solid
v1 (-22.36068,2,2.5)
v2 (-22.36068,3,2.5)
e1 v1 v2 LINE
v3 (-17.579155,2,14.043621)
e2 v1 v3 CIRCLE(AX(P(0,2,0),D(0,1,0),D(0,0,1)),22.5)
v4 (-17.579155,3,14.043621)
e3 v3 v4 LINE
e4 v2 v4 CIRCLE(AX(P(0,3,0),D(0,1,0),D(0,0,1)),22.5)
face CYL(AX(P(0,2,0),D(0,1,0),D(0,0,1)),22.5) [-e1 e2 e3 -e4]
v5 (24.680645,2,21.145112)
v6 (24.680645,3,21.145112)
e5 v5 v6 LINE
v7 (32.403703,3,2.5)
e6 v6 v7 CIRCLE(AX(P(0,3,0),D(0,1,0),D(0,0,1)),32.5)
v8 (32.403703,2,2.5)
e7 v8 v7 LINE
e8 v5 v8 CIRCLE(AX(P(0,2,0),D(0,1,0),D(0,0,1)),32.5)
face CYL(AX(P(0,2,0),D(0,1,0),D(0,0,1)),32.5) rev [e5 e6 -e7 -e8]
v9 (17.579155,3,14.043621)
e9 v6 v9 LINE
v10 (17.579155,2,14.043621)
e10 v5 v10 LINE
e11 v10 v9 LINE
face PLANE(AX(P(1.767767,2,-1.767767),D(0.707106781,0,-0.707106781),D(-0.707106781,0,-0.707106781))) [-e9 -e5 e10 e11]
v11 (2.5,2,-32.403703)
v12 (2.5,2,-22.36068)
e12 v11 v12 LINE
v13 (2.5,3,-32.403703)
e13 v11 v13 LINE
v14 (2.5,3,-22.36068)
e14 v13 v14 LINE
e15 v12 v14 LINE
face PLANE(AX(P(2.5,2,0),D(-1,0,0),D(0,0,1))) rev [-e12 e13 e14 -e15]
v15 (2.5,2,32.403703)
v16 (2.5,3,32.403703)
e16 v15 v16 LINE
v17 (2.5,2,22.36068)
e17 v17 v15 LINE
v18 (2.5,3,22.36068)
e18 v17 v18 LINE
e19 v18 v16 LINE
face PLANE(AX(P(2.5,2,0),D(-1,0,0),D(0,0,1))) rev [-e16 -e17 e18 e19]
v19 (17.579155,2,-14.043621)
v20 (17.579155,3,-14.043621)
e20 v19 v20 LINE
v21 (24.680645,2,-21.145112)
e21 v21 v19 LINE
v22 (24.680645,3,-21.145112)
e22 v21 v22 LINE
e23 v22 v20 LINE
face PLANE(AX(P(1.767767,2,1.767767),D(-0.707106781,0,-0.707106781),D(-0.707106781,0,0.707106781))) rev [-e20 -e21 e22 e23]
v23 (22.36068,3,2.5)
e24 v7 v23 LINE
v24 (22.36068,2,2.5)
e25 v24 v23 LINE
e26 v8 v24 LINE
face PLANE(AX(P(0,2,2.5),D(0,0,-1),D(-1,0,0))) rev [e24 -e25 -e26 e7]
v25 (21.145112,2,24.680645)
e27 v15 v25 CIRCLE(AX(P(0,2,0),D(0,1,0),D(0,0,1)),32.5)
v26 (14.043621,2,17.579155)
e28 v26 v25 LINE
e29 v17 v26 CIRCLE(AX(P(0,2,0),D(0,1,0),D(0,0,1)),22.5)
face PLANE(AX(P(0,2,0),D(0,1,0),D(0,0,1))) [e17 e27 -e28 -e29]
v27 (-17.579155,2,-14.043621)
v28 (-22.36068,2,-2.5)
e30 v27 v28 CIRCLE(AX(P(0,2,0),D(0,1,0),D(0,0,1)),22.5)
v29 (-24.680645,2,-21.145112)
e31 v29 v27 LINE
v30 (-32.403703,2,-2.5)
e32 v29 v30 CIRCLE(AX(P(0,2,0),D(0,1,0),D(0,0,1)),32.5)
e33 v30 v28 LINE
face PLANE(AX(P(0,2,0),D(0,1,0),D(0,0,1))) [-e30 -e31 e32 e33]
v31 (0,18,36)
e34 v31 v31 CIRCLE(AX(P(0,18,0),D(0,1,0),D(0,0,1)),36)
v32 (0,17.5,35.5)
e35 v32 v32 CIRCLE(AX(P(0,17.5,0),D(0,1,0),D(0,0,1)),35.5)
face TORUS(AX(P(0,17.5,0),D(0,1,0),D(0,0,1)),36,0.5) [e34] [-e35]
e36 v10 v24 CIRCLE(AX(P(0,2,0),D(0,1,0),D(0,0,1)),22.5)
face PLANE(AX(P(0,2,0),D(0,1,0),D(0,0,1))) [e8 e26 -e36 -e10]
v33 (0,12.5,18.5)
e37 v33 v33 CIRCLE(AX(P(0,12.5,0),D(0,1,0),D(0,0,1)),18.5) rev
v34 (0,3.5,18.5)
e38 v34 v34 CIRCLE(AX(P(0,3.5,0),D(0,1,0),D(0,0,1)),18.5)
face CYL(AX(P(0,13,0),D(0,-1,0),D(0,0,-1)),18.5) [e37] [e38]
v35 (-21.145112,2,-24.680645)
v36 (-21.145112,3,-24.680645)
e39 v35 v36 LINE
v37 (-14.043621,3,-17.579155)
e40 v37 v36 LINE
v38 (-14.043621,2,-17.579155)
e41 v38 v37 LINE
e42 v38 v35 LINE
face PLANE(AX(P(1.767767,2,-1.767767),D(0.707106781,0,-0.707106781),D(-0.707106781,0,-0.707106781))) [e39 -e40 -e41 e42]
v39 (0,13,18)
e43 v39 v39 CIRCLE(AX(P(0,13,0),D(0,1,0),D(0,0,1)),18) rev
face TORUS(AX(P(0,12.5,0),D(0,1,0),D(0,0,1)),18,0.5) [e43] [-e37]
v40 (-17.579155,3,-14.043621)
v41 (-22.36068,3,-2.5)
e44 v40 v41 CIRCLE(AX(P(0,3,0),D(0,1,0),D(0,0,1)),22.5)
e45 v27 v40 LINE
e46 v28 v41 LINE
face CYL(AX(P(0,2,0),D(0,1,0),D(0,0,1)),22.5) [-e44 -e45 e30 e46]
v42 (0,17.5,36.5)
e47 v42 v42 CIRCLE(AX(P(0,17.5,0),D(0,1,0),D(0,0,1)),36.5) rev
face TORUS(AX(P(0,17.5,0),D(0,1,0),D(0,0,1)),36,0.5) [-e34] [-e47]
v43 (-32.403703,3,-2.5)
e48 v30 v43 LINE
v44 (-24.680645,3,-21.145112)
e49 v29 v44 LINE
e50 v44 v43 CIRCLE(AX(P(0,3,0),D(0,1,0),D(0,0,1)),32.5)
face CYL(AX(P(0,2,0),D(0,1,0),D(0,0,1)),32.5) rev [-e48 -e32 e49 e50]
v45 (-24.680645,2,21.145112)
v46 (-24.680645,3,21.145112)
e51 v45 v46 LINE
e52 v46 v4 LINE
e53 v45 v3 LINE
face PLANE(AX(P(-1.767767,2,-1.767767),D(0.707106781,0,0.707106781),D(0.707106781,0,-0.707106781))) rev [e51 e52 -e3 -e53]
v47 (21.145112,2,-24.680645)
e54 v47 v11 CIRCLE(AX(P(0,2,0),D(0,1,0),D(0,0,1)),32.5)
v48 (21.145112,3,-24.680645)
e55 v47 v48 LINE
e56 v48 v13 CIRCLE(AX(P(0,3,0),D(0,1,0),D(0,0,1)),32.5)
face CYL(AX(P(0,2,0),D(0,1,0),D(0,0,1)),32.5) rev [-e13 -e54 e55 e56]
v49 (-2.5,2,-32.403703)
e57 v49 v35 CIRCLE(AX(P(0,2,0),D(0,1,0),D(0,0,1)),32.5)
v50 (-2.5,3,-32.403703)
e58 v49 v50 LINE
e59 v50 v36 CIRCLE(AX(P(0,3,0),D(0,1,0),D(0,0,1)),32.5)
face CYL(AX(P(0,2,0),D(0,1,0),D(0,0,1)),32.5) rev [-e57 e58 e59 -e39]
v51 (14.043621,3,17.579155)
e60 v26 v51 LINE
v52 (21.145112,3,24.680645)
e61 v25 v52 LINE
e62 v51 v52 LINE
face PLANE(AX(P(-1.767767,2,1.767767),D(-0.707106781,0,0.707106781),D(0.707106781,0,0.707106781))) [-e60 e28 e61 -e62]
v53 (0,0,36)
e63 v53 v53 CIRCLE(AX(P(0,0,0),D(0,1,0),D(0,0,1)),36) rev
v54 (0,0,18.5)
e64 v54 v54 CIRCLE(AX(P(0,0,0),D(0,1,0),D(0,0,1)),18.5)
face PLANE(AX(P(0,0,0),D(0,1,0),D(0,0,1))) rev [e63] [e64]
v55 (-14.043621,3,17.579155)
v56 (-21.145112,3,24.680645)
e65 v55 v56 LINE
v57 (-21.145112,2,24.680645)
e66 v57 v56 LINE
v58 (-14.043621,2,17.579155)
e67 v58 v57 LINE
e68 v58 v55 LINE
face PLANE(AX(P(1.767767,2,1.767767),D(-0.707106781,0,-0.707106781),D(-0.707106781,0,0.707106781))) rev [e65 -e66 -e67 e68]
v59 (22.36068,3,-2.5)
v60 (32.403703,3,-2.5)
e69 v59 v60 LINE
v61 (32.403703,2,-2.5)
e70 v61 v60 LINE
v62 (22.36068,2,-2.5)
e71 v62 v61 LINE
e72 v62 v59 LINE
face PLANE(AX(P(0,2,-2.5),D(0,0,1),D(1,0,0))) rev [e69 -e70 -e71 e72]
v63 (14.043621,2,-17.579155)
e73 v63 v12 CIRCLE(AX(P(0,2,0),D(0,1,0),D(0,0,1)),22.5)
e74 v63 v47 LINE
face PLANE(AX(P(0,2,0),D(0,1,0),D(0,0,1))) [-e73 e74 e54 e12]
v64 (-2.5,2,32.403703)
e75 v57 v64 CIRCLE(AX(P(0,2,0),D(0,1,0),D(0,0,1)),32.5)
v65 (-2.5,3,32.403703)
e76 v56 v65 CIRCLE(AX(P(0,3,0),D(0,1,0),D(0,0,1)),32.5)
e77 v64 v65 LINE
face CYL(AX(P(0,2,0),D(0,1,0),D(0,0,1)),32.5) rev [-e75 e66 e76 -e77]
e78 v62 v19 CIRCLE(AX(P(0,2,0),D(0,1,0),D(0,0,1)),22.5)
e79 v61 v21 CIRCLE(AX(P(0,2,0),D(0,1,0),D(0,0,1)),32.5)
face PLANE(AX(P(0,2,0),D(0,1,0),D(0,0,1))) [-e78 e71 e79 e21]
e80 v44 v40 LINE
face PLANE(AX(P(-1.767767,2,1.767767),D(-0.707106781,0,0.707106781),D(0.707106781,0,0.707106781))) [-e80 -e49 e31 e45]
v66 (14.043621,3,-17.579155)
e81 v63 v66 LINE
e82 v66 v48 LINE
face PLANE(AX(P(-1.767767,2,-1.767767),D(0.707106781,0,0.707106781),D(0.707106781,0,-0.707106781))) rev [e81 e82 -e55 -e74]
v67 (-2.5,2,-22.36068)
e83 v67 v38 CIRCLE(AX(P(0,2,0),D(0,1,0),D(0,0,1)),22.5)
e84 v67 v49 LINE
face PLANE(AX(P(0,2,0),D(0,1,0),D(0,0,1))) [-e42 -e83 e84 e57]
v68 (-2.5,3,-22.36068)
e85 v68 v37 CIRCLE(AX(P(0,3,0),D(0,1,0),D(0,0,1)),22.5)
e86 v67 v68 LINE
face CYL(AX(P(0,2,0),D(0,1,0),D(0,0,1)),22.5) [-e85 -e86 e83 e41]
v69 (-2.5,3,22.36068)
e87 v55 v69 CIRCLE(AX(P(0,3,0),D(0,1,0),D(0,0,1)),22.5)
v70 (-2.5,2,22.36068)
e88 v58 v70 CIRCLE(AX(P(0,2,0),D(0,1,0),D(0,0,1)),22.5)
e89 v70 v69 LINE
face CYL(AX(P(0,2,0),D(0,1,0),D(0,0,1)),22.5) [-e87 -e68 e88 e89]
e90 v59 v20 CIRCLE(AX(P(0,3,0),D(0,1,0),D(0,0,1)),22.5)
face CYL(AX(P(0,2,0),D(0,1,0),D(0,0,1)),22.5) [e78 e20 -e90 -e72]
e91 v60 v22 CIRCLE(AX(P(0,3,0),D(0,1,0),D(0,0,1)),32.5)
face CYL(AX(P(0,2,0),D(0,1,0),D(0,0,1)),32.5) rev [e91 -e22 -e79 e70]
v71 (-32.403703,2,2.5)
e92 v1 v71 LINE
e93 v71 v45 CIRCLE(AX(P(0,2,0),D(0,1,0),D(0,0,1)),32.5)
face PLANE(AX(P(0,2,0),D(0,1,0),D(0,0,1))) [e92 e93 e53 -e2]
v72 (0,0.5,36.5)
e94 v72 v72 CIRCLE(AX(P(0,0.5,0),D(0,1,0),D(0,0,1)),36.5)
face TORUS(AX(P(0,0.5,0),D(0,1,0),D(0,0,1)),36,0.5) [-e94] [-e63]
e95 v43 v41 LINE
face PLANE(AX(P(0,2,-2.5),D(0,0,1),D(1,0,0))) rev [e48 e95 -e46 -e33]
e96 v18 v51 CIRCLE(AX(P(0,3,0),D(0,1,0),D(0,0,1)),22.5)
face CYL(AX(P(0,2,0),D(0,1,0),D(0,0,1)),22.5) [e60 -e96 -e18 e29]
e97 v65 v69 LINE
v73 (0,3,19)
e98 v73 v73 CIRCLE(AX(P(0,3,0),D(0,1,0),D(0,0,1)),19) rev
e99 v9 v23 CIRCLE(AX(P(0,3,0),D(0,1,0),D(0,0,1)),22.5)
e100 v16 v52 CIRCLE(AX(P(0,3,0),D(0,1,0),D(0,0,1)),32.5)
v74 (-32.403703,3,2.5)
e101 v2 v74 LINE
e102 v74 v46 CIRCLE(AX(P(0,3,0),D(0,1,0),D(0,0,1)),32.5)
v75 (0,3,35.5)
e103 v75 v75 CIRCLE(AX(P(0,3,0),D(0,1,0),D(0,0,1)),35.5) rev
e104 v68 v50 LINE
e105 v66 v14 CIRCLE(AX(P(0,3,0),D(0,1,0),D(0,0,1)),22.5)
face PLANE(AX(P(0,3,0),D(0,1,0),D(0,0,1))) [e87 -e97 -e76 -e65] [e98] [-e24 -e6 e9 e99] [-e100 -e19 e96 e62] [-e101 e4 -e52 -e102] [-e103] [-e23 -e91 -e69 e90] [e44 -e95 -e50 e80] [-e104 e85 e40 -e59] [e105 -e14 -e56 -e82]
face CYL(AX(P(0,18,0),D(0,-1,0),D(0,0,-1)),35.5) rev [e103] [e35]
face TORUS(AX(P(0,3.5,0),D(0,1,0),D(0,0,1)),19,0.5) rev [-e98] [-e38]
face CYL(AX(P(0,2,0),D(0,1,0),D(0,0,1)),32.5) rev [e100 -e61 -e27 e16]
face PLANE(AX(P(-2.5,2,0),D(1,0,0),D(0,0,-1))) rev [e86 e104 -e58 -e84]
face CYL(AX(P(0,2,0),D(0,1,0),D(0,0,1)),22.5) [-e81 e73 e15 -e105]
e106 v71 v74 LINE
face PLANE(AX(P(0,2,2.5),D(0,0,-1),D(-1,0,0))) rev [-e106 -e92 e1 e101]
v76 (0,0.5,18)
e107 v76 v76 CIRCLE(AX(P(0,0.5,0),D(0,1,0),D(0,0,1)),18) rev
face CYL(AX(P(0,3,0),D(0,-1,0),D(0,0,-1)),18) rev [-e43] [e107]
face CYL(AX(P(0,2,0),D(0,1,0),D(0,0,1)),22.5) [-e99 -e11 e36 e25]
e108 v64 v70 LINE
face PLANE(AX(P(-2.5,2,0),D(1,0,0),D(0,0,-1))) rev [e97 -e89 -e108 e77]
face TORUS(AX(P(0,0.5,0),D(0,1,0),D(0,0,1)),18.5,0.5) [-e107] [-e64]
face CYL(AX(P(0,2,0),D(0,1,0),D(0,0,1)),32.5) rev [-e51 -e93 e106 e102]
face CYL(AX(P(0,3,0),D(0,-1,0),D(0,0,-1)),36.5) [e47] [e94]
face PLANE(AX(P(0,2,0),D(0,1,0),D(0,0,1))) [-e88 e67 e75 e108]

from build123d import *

# Parameters (mm, degrees)
SKETCH2_R           = 36.5
SKETCH2_R_2         = 18
BOSS_EXTRUDE1_DEPTH = 3
SKETCH3_R           = 36.5
SKETCH3_R_2         = 35.5
BOSS_EXTRUDE2_DEPTH = 15
SKETCH4_R           = 18.5
SKETCH4_R_2         = 18
BOSS_EXTRUDE3_DEPTH = 10
FILLET1_R           = 0.5
CUT_EXTRUDE1_DEPTH  = 1


with BuildPart() as part:
    # Sketch2 → Boss-Extrude1 (new body)
    with BuildSketch(Plane(origin=(0, 0, 0), x_dir=(1, 0, 0), z_dir=(0, 1, 0))):
        with Locations(Location((0, 0, 0), (0, 0, 270))):
            Circle(SKETCH2_R)
        with Locations(Location((0, 0, 0), (0, 0, 270))):
            Circle(SKETCH2_R_2, mode=Mode.SUBTRACT)
    extrude(amount=BOSS_EXTRUDE1_DEPTH)

    # Sketch3 → Boss-Extrude2 (add)
    with BuildSketch(Plane(origin=(0, 3, 0), x_dir=(1, 0, 0), z_dir=(0, 1, 0))):
        with Locations(Location((0, 0, 0), (0, 0, 270))):
            Circle(SKETCH3_R)
        with Locations(Location((0, 0, 0), (0, 0, 270))):
            Circle(SKETCH3_R_2, mode=Mode.SUBTRACT)
    extrude(amount=BOSS_EXTRUDE2_DEPTH)

    # Sketch4 → Boss-Extrude3 (add)
    with BuildSketch(Plane(origin=(0, 3, 0), x_dir=(1, 0, 0), z_dir=(0, 1, 0))):
        with Locations(Location((0, 0, 0), (0, 0, 270))):
            Circle(SKETCH4_R)
        with Locations(Location((0, 0, 0), (0, 0, 270))):
            Circle(SKETCH4_R_2, mode=Mode.SUBTRACT)
    extrude(amount=BOSS_EXTRUDE3_DEPTH)

    # Fillet1
    fillet1_edges = [part.edges().sort_by_distance(p)[0] for p in [
        (0, 18, -35.5),
        (0, 18, -36.5),
        (0, 3, -18.5),
        (0, 13, -18.5),
        (0, 0, -36.5),
        (0, 0, -18),
    ]]
    fillet(fillet1_edges, radius=FILLET1_R - 0.0001)  # a hair under: the kernel refuses the full size

    # Sketch5 → Cut-Extrude1 (cut)
    with BuildSketch(Plane(origin=(0, 3, 0), x_dir=(1, 0, 0), z_dir=(0, 1, 0))):
        with BuildLine():
            ThreePointArc((-2.5, 22.360679775), (-8.610377228, 20.787289482), (-14.043621348, 17.579155254))
            Line((-14.043621348, 17.579155254), (-21.145111522, 24.680645428))
            ThreePointArc((-21.145111522, 24.680645428), (-12.437211552, 30.026084807), (-2.5, 32.403703492))
            Line((-2.5, 32.403703492), (-2.5, 22.360679775))
        make_face()
        with BuildLine():
            Line((14.043621348, 17.579155254), (21.145111522, 24.680645428))
            ThreePointArc((21.145111522, 24.680645428), (12.437211552, 30.026084807), (2.5, 32.403703492))
            Line((2.5, 32.403703492), (2.5, 22.360679775))
            ThreePointArc((2.5, 22.360679775), (8.610377228, 20.787289482), (14.043621348, 17.579155254))
        make_face()
        with BuildLine():
            Line((22.360679775, 2.5), (32.403703492, 2.5))
            ThreePointArc((32.403703492, 2.5), (30.026084807, 12.437211552), (24.680645428, 21.145111522))
            Line((24.680645428, 21.145111522), (17.579155254, 14.043621348))
            ThreePointArc((17.579155254, 14.043621348), (20.787289482, 8.610377228), (22.360679775, 2.5))
        make_face()
        with BuildLine():
            Line((24.680645428, -21.145111522), (17.579155254, -14.043621348))
            ThreePointArc((17.579155254, -14.043621348), (20.787289482, -8.610377228), (22.360679775, -2.5))
            Line((22.360679775, -2.5), (32.403703492, -2.5))
            ThreePointArc((32.403703492, -2.5), (30.026084807, -12.437211552), (24.680645428, -21.145111522))
        make_face()
        with BuildLine():
            ThreePointArc((-17.579155254, 14.043621348), (-20.787289482, 8.610377228), (-22.360679775, 2.5))
            Line((-22.360679775, 2.5), (-32.403703492, 2.5))
            ThreePointArc((-32.403703492, 2.5), (-30.026084807, 12.437211552), (-24.680645428, 21.145111522))
            Line((-24.680645428, 21.145111522), (-17.579155254, 14.043621348))
        make_face()
        with BuildLine():
            ThreePointArc((-22.360679775, -2.5), (-20.787289482, -8.610377228), (-17.579155254, -14.043621348))
            Line((-17.579155254, -14.043621348), (-24.680645428, -21.145111522))
            ThreePointArc((-24.680645428, -21.145111522), (-30.026084807, -12.437211552), (-32.403703492, -2.5))
            Line((-32.403703492, -2.5), (-22.360679775, -2.5))
        make_face()
        with BuildLine():
            Line((-14.043621348, -17.579155254), (-21.145111522, -24.680645428))
            ThreePointArc((-21.145111522, -24.680645428), (-12.437211552, -30.026084807), (-2.5, -32.403703492))
            Line((-2.5, -32.403703492), (-2.5, -22.360679775))
            ThreePointArc((-2.5, -22.360679775), (-8.610377228, -20.787289482), (-14.043621348, -17.579155254))
        make_face()
        with BuildLine():
            Line((2.5, -22.360679775), (2.5, -32.403703492))
            ThreePointArc((2.5, -32.403703492), (12.437211552, -30.026084807), (21.145111522, -24.680645428))
            Line((21.145111522, -24.680645428), (14.043621348, -17.579155254))
            ThreePointArc((14.043621348, -17.579155254), (8.610377228, -20.787289482), (2.5, -22.360679775))
        make_face()
    extrude(amount=-CUT_EXTRUDE1_DEPTH, mode=Mode.SUBTRACT)


solid = part.part
